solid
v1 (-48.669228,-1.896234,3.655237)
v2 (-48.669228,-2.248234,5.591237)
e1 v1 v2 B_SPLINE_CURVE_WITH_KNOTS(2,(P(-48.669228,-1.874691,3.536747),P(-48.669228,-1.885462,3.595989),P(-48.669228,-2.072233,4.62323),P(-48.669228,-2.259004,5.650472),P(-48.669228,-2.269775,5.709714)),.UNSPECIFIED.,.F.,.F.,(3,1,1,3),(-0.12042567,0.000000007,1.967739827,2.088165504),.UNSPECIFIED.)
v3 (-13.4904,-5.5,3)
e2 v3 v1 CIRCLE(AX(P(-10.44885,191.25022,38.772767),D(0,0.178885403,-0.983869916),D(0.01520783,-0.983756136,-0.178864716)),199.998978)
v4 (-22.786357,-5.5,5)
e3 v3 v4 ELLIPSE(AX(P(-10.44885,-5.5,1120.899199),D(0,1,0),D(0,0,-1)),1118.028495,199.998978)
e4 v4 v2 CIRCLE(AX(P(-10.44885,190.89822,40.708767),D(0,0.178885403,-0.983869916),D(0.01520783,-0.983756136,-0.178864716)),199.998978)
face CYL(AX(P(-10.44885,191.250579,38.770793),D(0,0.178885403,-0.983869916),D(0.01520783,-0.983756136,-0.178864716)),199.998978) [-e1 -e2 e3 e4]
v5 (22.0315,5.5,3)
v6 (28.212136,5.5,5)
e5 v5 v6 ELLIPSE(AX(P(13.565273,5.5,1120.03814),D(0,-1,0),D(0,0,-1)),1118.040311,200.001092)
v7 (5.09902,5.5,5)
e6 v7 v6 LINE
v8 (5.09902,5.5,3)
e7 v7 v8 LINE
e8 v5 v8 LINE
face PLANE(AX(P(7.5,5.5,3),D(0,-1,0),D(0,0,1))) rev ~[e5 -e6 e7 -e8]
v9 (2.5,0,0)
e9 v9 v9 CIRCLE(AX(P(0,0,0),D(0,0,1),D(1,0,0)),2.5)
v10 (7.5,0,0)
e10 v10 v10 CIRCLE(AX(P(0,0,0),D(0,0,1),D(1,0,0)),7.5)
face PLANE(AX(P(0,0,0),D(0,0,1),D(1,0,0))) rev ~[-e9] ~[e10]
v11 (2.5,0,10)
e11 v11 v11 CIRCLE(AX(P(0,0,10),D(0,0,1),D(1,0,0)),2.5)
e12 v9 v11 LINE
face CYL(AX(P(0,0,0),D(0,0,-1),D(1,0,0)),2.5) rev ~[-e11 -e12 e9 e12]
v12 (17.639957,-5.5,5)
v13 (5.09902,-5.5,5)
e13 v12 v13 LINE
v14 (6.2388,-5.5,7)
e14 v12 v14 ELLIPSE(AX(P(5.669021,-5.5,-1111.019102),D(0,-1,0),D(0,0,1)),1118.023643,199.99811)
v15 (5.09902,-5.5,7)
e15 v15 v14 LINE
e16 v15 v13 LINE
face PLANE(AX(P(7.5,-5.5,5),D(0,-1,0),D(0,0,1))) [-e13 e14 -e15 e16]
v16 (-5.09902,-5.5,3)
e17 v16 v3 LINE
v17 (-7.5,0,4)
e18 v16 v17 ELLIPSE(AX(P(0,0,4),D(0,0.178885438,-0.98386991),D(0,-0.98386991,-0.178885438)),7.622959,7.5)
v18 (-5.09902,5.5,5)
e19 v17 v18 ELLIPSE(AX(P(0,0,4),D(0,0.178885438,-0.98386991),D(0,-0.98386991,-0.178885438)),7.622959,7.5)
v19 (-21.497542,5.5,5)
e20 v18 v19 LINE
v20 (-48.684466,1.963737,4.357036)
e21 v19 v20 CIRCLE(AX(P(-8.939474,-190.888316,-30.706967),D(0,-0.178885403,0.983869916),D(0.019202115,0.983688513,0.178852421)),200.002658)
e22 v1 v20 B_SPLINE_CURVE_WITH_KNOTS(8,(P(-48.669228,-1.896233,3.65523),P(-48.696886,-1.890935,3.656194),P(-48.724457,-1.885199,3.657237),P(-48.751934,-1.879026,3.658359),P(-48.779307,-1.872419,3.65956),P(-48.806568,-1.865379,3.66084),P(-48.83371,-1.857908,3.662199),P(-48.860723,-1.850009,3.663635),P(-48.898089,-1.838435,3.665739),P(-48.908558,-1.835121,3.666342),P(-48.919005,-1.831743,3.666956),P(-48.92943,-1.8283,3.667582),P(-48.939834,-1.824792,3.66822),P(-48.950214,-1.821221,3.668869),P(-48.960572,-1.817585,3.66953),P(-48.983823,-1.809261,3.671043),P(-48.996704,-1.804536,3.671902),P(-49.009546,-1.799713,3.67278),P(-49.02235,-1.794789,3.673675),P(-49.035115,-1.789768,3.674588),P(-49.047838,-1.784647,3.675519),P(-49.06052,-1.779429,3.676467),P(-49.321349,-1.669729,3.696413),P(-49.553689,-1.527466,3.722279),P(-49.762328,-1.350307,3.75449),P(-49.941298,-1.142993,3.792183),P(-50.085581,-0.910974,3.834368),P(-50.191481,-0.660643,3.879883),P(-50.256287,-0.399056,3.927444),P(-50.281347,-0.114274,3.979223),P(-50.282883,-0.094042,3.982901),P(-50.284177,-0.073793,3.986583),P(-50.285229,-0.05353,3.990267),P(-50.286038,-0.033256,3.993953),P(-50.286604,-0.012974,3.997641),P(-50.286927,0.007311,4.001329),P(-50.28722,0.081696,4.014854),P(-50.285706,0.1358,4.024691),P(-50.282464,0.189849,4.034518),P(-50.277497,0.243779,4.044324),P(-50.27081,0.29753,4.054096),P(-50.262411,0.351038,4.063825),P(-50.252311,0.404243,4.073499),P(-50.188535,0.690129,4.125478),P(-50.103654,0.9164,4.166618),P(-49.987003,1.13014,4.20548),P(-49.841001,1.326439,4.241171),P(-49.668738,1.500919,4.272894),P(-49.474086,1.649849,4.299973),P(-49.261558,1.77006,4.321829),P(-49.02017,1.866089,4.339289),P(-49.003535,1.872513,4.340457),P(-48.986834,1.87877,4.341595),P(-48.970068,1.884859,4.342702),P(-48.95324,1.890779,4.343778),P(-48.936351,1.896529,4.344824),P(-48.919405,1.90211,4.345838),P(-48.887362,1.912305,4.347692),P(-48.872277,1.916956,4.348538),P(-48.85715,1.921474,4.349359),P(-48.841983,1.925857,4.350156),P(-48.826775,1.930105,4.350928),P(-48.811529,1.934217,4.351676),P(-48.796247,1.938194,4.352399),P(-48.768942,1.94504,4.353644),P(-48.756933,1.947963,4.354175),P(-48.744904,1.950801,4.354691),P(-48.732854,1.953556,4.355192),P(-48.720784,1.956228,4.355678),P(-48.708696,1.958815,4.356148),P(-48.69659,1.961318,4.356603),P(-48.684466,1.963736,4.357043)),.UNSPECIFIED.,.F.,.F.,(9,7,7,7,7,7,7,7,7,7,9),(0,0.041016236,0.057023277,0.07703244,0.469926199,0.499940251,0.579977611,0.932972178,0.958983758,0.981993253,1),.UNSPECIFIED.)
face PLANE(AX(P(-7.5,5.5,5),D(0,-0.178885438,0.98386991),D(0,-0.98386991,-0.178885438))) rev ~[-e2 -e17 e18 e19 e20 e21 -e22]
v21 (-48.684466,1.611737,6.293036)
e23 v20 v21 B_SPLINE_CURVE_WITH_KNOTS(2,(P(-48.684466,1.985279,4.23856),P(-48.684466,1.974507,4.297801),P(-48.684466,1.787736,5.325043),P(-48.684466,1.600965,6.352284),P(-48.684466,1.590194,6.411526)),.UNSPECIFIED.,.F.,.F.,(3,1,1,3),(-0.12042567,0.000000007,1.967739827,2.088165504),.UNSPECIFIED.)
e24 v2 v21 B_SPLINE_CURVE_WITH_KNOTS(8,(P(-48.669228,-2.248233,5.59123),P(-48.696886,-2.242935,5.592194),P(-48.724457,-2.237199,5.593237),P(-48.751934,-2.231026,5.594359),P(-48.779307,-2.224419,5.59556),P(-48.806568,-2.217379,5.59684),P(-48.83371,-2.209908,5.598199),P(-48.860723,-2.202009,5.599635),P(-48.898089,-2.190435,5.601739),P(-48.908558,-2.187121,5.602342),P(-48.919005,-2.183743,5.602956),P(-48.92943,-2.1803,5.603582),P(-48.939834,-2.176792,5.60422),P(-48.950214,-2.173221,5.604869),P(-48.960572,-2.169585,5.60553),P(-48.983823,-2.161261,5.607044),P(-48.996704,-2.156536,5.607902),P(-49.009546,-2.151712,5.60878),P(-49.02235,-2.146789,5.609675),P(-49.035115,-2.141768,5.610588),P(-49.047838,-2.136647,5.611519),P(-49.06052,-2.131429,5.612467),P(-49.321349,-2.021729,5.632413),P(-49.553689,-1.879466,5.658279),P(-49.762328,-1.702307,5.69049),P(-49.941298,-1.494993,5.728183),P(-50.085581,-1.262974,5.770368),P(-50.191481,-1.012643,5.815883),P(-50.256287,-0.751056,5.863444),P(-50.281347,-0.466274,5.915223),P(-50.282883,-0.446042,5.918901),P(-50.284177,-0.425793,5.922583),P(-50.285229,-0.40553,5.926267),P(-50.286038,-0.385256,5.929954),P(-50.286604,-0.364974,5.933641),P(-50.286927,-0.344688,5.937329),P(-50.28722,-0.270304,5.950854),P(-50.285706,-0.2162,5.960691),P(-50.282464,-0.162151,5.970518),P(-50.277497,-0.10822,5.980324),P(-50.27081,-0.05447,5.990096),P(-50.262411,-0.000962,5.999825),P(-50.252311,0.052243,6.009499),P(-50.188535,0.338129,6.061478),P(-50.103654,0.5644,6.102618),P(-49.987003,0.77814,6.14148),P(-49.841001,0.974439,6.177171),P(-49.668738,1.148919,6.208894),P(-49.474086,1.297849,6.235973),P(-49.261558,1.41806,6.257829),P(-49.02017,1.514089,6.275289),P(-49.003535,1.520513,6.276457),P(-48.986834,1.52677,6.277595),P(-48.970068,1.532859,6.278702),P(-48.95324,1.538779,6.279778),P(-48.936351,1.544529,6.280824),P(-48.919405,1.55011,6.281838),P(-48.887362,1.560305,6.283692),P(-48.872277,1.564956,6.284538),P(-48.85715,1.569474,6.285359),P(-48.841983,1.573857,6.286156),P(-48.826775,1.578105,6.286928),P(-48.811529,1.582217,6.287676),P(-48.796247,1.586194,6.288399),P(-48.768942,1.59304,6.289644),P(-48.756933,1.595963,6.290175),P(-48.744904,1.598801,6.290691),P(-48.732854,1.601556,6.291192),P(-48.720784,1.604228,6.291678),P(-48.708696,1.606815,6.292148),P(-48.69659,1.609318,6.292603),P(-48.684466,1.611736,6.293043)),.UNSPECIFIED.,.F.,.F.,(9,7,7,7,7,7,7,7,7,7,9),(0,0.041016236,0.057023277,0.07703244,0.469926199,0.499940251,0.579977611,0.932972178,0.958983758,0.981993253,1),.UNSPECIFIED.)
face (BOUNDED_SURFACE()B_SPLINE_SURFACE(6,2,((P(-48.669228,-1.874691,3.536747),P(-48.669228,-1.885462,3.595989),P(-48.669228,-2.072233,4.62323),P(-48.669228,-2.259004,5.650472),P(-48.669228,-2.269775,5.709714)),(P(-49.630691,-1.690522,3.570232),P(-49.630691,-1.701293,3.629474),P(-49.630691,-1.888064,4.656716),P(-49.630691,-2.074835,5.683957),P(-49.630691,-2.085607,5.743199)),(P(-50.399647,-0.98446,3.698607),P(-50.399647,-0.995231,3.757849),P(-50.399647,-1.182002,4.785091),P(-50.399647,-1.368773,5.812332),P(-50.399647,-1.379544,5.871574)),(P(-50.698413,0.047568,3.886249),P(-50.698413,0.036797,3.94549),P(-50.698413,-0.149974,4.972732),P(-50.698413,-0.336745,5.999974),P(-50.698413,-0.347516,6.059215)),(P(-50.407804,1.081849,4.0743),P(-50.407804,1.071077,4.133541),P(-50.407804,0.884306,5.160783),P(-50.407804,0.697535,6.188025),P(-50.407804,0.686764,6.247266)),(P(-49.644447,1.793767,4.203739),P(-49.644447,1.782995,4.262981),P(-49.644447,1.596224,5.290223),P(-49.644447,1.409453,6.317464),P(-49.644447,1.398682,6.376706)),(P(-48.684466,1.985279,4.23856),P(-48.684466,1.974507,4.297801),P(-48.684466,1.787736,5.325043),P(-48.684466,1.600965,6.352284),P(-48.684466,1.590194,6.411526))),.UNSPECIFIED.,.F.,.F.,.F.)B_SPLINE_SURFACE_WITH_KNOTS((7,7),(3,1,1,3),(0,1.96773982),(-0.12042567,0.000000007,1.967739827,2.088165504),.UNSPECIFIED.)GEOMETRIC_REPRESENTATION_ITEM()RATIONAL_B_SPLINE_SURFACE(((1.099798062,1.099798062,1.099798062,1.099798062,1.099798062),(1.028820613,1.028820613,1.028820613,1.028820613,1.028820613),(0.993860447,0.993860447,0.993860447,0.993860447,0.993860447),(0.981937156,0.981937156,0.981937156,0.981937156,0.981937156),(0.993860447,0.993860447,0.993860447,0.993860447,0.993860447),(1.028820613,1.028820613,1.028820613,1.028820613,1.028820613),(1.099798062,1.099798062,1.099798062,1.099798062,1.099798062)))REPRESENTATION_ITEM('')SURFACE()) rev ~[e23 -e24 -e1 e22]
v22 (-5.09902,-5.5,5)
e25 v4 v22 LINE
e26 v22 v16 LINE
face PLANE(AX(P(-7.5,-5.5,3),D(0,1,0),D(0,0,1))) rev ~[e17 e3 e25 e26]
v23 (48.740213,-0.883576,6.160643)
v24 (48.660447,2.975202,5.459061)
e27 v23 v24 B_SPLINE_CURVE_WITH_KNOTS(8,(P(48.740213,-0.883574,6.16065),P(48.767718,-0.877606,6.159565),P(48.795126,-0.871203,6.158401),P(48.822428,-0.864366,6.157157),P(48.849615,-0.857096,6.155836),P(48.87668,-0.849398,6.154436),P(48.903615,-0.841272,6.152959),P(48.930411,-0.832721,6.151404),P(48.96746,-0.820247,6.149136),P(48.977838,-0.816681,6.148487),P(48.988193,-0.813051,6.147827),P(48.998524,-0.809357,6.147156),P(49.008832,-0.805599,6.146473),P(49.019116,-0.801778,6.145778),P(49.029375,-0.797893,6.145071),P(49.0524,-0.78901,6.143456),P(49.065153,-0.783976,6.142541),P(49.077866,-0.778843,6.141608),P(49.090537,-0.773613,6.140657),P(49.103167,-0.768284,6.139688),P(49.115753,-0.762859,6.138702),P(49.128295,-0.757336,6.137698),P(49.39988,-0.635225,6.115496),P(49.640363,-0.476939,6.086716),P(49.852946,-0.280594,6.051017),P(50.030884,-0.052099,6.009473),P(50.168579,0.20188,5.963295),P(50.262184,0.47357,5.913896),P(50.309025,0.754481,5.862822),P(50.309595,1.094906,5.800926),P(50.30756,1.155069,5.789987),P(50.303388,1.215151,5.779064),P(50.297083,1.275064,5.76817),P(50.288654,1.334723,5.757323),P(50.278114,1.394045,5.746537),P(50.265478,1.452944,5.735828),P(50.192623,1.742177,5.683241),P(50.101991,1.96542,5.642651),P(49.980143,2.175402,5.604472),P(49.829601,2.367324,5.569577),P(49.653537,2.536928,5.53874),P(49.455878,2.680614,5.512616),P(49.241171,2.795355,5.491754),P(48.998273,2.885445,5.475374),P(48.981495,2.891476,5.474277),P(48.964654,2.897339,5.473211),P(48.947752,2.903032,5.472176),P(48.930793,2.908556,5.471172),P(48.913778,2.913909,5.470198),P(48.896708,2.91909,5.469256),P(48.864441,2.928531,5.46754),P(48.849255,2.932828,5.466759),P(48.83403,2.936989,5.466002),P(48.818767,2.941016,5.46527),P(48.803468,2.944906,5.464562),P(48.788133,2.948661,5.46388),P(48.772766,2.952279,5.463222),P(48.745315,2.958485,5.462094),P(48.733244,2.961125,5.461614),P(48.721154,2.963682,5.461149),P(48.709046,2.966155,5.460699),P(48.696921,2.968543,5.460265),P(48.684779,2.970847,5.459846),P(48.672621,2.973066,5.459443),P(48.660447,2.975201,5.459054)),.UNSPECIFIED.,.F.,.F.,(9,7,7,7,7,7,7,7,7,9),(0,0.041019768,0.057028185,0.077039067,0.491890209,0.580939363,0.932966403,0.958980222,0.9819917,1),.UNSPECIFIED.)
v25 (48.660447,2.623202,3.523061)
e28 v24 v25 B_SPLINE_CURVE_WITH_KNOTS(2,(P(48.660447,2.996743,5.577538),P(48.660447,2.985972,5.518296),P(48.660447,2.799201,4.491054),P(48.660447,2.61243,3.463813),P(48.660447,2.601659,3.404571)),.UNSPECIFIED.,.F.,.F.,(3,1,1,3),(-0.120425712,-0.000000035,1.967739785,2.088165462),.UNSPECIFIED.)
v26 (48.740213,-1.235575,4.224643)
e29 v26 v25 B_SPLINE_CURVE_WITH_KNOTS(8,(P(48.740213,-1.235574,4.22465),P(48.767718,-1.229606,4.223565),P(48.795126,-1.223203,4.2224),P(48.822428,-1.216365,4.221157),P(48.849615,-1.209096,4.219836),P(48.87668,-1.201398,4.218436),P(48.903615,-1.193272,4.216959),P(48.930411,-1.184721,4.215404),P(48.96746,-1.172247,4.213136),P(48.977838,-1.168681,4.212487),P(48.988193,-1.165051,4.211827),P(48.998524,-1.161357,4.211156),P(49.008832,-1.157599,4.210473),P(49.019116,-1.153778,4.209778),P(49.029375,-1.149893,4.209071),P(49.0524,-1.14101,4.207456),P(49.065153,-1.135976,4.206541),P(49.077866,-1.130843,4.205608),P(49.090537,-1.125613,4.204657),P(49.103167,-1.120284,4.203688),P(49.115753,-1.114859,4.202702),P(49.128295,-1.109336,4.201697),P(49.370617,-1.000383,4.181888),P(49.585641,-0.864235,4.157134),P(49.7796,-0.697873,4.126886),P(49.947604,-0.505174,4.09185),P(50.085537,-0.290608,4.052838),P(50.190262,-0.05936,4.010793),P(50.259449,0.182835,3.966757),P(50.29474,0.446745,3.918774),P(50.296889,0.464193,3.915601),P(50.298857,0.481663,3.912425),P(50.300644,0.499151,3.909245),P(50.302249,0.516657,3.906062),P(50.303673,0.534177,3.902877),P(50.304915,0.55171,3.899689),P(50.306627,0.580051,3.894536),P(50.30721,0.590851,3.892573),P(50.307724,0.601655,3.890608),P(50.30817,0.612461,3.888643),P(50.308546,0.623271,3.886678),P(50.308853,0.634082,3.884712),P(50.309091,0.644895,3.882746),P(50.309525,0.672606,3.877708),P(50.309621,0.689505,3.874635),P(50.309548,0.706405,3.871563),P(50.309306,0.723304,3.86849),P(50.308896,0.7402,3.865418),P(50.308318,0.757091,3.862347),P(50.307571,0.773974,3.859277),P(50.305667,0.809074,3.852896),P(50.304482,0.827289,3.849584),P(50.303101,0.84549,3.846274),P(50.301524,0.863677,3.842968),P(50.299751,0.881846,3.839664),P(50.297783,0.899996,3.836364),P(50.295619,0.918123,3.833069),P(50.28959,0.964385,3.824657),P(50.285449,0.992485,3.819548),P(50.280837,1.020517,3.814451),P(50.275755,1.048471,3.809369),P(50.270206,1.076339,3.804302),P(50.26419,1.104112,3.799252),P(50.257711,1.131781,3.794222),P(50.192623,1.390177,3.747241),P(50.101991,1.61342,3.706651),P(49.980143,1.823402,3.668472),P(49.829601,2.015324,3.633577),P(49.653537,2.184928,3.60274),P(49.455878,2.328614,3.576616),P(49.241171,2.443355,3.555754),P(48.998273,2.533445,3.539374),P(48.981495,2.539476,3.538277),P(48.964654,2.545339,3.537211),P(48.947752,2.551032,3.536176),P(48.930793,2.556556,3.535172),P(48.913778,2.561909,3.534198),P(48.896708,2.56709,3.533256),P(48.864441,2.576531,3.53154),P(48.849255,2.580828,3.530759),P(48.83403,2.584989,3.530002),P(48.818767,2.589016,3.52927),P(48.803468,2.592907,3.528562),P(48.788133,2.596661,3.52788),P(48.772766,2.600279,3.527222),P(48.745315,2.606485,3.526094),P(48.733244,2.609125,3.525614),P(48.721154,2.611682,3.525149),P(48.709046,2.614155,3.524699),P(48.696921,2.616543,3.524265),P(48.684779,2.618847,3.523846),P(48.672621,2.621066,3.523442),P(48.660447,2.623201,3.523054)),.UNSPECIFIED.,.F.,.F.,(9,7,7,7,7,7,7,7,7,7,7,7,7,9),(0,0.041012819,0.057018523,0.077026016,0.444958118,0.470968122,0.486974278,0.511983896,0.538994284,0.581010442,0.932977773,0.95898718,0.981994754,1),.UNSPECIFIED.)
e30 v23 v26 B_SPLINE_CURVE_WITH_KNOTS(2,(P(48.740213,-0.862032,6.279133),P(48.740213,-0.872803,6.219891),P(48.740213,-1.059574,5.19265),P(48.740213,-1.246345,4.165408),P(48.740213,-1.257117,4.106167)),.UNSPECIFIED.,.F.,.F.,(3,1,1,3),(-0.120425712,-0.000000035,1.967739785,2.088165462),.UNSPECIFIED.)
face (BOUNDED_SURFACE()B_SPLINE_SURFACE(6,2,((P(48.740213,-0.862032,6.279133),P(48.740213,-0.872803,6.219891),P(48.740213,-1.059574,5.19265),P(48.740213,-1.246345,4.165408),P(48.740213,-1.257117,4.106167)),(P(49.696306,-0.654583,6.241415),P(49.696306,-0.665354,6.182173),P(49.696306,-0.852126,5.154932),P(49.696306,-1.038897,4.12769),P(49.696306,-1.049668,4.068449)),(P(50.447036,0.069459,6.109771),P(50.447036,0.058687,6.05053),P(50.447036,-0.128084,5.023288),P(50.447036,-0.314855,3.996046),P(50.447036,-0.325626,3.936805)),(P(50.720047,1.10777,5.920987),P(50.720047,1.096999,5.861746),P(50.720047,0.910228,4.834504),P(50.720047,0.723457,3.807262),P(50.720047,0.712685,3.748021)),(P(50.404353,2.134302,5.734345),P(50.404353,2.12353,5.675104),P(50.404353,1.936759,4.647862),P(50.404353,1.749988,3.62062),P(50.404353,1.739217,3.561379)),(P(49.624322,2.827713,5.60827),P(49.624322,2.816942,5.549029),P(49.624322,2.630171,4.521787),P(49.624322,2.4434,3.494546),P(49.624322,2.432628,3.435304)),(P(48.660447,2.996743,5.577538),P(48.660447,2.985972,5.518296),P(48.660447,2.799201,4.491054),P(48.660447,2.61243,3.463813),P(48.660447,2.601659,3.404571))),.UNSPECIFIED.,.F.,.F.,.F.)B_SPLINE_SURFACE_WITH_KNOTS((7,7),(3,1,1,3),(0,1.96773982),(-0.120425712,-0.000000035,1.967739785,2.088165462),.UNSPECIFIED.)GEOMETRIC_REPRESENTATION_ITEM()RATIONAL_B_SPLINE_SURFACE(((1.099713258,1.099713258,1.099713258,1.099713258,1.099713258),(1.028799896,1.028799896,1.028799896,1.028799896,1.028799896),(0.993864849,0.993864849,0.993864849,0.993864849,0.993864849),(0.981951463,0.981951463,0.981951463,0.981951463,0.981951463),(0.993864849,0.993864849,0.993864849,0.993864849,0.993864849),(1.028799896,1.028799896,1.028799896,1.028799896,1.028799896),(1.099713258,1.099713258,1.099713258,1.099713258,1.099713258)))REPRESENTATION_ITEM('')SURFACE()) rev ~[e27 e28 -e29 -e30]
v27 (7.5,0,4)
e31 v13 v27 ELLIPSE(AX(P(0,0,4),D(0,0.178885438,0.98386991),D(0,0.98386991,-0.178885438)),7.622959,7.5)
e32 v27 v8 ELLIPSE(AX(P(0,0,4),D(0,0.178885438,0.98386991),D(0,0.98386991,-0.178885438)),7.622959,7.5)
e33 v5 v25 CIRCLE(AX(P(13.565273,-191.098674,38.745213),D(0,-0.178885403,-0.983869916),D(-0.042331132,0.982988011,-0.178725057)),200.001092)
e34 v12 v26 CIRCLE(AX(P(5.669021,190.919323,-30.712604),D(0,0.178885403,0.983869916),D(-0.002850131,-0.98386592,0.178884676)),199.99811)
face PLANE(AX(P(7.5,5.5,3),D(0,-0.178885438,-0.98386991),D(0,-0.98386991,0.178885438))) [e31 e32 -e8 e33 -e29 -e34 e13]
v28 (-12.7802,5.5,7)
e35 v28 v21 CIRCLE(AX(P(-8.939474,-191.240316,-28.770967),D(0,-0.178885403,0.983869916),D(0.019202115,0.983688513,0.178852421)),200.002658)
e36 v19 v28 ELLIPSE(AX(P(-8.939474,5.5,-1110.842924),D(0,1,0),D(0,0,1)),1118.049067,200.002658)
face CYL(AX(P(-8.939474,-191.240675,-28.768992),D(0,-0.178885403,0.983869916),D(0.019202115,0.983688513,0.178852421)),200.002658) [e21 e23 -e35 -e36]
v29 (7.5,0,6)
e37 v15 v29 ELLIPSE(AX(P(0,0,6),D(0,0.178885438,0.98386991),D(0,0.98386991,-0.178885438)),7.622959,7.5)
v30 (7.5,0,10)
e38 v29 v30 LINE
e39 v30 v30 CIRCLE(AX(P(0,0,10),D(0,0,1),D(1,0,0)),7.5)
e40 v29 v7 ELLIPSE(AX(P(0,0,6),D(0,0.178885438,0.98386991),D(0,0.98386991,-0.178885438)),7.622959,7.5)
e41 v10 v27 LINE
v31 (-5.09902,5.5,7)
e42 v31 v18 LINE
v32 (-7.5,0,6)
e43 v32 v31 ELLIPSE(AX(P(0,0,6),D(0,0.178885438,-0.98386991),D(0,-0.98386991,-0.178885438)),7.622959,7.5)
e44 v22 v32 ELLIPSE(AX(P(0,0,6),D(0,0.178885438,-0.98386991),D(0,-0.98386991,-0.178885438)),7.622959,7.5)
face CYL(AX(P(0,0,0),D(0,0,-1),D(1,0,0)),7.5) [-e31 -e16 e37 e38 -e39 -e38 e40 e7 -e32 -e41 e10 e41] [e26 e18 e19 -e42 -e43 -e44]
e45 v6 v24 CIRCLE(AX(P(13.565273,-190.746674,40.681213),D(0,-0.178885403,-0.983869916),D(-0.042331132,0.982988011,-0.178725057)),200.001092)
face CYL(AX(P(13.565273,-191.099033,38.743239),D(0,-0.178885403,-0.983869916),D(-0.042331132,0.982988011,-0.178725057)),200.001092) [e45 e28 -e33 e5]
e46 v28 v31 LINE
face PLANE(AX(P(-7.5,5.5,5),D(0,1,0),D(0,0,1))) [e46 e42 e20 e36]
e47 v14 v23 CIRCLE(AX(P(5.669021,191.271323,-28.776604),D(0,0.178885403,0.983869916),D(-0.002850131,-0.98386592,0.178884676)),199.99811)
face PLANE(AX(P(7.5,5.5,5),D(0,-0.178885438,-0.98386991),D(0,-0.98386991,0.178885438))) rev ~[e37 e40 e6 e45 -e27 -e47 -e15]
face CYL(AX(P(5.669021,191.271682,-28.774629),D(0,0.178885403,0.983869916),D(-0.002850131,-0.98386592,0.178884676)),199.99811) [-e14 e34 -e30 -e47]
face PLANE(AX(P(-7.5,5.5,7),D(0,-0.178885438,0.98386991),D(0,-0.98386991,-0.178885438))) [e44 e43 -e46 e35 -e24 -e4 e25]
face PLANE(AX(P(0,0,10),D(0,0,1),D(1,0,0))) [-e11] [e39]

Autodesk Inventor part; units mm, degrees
sketch "Sketch - Propeller Connecter" plane through (0, 0, 0) normal (0, 0, 1) x (1, 0, 0)
  circle A0 centre (0, 0) radius 7.5
  circle A1 centre (0, 0) radius 2.5
  dimension "d0" = 15
  dimension "d1" = 5
extrude "Extrusion1" add sketch "Sketch - Propeller Connecter" along normal blind 10
ref_plane "Work Plane1" through (0, 7.5, 0) normal (0, 1, 0) x (-1, 0, 0)
ref_plane "Work Plane2" through (-7.5, 0, 0) normal (1, 0, 0) x (0, 1, 0)
sketch "Sketch3" plane through (-7.5, 0, 0) normal (1, 0, 0) x (0, 1, 0)
  line L0 (7.5, 10) -> (-7.5, 10) projected
  line L1 (7.5, 10) -> (7.5, 0)
  line L2 (7.5, 0) -> (7.5, 10) projected
  line L3 (-7.5, 0) -> (7.5, 0) projected
  line L4 (-7.5, 10) -> (-7.5, 0)
  line L5 (-7.5, 0) -> (-7.5, 10) projected
  line L6 (5.5, 7) -> (-5.5, 5)
  line L7 (5.5, 5) -> (-5.5, 3)
  line L8 (5.5, 5) -> (5.5, 7)
  line L9 (-5.5, 3) -> (-5.5, 5)
  point P0 (0, 0)
  point P1 (0, 5)
  dimension "d27" = 5
  dimension "d28" = 3
  dimension "d29" = 3
  dimension "d30" = 5
  dimension "d32" = 2
  dimension "d33" = 2
  dimension "d34" = 2
  dimension "d35" = 2
sketch3d "3D Sketch2"
ref_plane "Work Plane3" through (7.5, 0, 0) normal (1, 0, 0) x (0, 1, 0)
sketch "Sketch4" plane through (7.5, 0, 0) normal (1, 0, 0) x (0, 1, 0)
  line L0 (5.5, 5) -> (-5.5, 7)
  line L1 (5.5, 3) -> (-5.5, 5)
  line L2 (5.5, 3) -> (5.5, 5)
  line L3 (-5.5, 5) -> (-5.5, 7)
  line L4 (7.5, 10) -> (-7.5, 10) projected
  line L5 (-7.5, 0) -> (7.5, 0) projected
  line L6 (-7.5, 0) -> (-7.5, 10)
  line L7 (7.5, 0) -> (7.5, 10)
  point P0 (0, 0)
  point P1 (0, 5)
  dimension "d38" = 3
  dimension "d39" = 5
  dimension "d40" = 3
  dimension "d42" = 5
  dimension "d43" = 2
  dimension "d44" = 2
  dimension "d45" = 2
  dimension "d46" = 2
sketch3d "3D Sketch3"
extrude "Extrusion2" add sketch "Sketch4" against normal blind 5 contours L2 L1 L3 L0
extrude "Extrusion3" add sketch "Sketch4" along normal blind 50 contours L2 L1 L3 L0
extrude "Extrusion4" add sketch "Sketch3" along normal blind 5 contours L8 L7 L9 L6
extrude "Extrusion5" add sketch "Sketch3" against normal blind 50 contours L8 L7 L9 L6
sketch "Sketch8" plane through (-5.099, -5.5, 3) normal (0, 0.1788854, -0.9838699) x (-1, 0, 0)
  line L0 (52.401, 0) -> (0, 0) projected
  line L1 (52.401, 11.1803) -> (52.401, 0) projected
  arc A0 (2.3083, 0) -> (52.401, 5.5902) centre (5.3498, 199.9769) ccw
  line L2 (52.401, 5.5902) -> (52.401, 0)
  line L3 (52.401, 0) -> (8.3914, 0)
  point P0 (-5.099, 4.8746)
  dimension "d59" = 200
extrude "Extrusion6" cut sketch "Sketch8" against normal blind 30 contours L0 A0 L1
sketch "Sketch15" plane through (57.5, 5.5, 3) normal (0, -0.1788854, -0.9838699) x (-1, 0, 0)
  line L0 (52.401, -0.3578) -> (52.401, 0) projected
  arc A0 (52.401, 0) -> (-0.7421, -4.8746) centre (43.9347, -199.8207) ccw
  line L1 (-0.7421, -4.8746) -> (-0.7421, 0)
  line L2 (-0.7421, 0) -> (35.4685, 0)
  point P0 (57.5, -4.8746)
  dimension "d67" = 200
extrude "Extrusion7" cut sketch "Sketch15" against normal blind 30
sketch "Sketch16" plane through (-57.5, 5.5, 7) normal (0, -0.1788854, 0.9838699) x (1, 0, 0)
  line L0 (52.401, -0.3578) -> (52.401, 0) projected
  line L1 (0, -5.9479) -> (0, 0) projected
  arc A0 (52.401, 0) -> (0, -5.9479) centre (48.5604, -199.9631) ccw
  line L2 (0, 0) -> (44.7198, 0)
  line L3 (52.401, 0) -> (0, 0) projected
  point P0 (57.5, -6.6635)
  dimension "d70" = 200
extrude "Extrusion8" cut sketch "Sketch16" against normal blind 30 contours L1 L2 A0
sketch "Sketch17" plane through (5.099, -5.5, 7) normal (0, 0.1788854, 0.9838699) x (1, 0, 0)
  ellipse E0 centre (-5.099, 5.5902) end of major axis (-5.099, -2.0328) minor radius 7.5 (0, 0) -> (0, 11.1803) ccw projected
  line L0 (52.401, 6.8321) -> (52.401, 0) projected
  arc A0 (0, 0) -> (52.401, 6.8321) centre (0.5699, 199.9992) ccw
  line L1 (52.401, 0) -> (1.1398, 0)
  line L2 (0, 0) -> (52.401, 0) projected
  point P0 (-5.099, 6.6635)
  dimension "d73" = 200
extrude "Extrusion9" cut sketch "Sketch17" against normal blind 30
fillet "Fillet1" radius 2 1 edges at (57.5, 1.0459, 4.8098)
fillet "Fillet2" radius 2 1 edges at (-57.5, -0.176, 4.968)
properties part number "propeller"
